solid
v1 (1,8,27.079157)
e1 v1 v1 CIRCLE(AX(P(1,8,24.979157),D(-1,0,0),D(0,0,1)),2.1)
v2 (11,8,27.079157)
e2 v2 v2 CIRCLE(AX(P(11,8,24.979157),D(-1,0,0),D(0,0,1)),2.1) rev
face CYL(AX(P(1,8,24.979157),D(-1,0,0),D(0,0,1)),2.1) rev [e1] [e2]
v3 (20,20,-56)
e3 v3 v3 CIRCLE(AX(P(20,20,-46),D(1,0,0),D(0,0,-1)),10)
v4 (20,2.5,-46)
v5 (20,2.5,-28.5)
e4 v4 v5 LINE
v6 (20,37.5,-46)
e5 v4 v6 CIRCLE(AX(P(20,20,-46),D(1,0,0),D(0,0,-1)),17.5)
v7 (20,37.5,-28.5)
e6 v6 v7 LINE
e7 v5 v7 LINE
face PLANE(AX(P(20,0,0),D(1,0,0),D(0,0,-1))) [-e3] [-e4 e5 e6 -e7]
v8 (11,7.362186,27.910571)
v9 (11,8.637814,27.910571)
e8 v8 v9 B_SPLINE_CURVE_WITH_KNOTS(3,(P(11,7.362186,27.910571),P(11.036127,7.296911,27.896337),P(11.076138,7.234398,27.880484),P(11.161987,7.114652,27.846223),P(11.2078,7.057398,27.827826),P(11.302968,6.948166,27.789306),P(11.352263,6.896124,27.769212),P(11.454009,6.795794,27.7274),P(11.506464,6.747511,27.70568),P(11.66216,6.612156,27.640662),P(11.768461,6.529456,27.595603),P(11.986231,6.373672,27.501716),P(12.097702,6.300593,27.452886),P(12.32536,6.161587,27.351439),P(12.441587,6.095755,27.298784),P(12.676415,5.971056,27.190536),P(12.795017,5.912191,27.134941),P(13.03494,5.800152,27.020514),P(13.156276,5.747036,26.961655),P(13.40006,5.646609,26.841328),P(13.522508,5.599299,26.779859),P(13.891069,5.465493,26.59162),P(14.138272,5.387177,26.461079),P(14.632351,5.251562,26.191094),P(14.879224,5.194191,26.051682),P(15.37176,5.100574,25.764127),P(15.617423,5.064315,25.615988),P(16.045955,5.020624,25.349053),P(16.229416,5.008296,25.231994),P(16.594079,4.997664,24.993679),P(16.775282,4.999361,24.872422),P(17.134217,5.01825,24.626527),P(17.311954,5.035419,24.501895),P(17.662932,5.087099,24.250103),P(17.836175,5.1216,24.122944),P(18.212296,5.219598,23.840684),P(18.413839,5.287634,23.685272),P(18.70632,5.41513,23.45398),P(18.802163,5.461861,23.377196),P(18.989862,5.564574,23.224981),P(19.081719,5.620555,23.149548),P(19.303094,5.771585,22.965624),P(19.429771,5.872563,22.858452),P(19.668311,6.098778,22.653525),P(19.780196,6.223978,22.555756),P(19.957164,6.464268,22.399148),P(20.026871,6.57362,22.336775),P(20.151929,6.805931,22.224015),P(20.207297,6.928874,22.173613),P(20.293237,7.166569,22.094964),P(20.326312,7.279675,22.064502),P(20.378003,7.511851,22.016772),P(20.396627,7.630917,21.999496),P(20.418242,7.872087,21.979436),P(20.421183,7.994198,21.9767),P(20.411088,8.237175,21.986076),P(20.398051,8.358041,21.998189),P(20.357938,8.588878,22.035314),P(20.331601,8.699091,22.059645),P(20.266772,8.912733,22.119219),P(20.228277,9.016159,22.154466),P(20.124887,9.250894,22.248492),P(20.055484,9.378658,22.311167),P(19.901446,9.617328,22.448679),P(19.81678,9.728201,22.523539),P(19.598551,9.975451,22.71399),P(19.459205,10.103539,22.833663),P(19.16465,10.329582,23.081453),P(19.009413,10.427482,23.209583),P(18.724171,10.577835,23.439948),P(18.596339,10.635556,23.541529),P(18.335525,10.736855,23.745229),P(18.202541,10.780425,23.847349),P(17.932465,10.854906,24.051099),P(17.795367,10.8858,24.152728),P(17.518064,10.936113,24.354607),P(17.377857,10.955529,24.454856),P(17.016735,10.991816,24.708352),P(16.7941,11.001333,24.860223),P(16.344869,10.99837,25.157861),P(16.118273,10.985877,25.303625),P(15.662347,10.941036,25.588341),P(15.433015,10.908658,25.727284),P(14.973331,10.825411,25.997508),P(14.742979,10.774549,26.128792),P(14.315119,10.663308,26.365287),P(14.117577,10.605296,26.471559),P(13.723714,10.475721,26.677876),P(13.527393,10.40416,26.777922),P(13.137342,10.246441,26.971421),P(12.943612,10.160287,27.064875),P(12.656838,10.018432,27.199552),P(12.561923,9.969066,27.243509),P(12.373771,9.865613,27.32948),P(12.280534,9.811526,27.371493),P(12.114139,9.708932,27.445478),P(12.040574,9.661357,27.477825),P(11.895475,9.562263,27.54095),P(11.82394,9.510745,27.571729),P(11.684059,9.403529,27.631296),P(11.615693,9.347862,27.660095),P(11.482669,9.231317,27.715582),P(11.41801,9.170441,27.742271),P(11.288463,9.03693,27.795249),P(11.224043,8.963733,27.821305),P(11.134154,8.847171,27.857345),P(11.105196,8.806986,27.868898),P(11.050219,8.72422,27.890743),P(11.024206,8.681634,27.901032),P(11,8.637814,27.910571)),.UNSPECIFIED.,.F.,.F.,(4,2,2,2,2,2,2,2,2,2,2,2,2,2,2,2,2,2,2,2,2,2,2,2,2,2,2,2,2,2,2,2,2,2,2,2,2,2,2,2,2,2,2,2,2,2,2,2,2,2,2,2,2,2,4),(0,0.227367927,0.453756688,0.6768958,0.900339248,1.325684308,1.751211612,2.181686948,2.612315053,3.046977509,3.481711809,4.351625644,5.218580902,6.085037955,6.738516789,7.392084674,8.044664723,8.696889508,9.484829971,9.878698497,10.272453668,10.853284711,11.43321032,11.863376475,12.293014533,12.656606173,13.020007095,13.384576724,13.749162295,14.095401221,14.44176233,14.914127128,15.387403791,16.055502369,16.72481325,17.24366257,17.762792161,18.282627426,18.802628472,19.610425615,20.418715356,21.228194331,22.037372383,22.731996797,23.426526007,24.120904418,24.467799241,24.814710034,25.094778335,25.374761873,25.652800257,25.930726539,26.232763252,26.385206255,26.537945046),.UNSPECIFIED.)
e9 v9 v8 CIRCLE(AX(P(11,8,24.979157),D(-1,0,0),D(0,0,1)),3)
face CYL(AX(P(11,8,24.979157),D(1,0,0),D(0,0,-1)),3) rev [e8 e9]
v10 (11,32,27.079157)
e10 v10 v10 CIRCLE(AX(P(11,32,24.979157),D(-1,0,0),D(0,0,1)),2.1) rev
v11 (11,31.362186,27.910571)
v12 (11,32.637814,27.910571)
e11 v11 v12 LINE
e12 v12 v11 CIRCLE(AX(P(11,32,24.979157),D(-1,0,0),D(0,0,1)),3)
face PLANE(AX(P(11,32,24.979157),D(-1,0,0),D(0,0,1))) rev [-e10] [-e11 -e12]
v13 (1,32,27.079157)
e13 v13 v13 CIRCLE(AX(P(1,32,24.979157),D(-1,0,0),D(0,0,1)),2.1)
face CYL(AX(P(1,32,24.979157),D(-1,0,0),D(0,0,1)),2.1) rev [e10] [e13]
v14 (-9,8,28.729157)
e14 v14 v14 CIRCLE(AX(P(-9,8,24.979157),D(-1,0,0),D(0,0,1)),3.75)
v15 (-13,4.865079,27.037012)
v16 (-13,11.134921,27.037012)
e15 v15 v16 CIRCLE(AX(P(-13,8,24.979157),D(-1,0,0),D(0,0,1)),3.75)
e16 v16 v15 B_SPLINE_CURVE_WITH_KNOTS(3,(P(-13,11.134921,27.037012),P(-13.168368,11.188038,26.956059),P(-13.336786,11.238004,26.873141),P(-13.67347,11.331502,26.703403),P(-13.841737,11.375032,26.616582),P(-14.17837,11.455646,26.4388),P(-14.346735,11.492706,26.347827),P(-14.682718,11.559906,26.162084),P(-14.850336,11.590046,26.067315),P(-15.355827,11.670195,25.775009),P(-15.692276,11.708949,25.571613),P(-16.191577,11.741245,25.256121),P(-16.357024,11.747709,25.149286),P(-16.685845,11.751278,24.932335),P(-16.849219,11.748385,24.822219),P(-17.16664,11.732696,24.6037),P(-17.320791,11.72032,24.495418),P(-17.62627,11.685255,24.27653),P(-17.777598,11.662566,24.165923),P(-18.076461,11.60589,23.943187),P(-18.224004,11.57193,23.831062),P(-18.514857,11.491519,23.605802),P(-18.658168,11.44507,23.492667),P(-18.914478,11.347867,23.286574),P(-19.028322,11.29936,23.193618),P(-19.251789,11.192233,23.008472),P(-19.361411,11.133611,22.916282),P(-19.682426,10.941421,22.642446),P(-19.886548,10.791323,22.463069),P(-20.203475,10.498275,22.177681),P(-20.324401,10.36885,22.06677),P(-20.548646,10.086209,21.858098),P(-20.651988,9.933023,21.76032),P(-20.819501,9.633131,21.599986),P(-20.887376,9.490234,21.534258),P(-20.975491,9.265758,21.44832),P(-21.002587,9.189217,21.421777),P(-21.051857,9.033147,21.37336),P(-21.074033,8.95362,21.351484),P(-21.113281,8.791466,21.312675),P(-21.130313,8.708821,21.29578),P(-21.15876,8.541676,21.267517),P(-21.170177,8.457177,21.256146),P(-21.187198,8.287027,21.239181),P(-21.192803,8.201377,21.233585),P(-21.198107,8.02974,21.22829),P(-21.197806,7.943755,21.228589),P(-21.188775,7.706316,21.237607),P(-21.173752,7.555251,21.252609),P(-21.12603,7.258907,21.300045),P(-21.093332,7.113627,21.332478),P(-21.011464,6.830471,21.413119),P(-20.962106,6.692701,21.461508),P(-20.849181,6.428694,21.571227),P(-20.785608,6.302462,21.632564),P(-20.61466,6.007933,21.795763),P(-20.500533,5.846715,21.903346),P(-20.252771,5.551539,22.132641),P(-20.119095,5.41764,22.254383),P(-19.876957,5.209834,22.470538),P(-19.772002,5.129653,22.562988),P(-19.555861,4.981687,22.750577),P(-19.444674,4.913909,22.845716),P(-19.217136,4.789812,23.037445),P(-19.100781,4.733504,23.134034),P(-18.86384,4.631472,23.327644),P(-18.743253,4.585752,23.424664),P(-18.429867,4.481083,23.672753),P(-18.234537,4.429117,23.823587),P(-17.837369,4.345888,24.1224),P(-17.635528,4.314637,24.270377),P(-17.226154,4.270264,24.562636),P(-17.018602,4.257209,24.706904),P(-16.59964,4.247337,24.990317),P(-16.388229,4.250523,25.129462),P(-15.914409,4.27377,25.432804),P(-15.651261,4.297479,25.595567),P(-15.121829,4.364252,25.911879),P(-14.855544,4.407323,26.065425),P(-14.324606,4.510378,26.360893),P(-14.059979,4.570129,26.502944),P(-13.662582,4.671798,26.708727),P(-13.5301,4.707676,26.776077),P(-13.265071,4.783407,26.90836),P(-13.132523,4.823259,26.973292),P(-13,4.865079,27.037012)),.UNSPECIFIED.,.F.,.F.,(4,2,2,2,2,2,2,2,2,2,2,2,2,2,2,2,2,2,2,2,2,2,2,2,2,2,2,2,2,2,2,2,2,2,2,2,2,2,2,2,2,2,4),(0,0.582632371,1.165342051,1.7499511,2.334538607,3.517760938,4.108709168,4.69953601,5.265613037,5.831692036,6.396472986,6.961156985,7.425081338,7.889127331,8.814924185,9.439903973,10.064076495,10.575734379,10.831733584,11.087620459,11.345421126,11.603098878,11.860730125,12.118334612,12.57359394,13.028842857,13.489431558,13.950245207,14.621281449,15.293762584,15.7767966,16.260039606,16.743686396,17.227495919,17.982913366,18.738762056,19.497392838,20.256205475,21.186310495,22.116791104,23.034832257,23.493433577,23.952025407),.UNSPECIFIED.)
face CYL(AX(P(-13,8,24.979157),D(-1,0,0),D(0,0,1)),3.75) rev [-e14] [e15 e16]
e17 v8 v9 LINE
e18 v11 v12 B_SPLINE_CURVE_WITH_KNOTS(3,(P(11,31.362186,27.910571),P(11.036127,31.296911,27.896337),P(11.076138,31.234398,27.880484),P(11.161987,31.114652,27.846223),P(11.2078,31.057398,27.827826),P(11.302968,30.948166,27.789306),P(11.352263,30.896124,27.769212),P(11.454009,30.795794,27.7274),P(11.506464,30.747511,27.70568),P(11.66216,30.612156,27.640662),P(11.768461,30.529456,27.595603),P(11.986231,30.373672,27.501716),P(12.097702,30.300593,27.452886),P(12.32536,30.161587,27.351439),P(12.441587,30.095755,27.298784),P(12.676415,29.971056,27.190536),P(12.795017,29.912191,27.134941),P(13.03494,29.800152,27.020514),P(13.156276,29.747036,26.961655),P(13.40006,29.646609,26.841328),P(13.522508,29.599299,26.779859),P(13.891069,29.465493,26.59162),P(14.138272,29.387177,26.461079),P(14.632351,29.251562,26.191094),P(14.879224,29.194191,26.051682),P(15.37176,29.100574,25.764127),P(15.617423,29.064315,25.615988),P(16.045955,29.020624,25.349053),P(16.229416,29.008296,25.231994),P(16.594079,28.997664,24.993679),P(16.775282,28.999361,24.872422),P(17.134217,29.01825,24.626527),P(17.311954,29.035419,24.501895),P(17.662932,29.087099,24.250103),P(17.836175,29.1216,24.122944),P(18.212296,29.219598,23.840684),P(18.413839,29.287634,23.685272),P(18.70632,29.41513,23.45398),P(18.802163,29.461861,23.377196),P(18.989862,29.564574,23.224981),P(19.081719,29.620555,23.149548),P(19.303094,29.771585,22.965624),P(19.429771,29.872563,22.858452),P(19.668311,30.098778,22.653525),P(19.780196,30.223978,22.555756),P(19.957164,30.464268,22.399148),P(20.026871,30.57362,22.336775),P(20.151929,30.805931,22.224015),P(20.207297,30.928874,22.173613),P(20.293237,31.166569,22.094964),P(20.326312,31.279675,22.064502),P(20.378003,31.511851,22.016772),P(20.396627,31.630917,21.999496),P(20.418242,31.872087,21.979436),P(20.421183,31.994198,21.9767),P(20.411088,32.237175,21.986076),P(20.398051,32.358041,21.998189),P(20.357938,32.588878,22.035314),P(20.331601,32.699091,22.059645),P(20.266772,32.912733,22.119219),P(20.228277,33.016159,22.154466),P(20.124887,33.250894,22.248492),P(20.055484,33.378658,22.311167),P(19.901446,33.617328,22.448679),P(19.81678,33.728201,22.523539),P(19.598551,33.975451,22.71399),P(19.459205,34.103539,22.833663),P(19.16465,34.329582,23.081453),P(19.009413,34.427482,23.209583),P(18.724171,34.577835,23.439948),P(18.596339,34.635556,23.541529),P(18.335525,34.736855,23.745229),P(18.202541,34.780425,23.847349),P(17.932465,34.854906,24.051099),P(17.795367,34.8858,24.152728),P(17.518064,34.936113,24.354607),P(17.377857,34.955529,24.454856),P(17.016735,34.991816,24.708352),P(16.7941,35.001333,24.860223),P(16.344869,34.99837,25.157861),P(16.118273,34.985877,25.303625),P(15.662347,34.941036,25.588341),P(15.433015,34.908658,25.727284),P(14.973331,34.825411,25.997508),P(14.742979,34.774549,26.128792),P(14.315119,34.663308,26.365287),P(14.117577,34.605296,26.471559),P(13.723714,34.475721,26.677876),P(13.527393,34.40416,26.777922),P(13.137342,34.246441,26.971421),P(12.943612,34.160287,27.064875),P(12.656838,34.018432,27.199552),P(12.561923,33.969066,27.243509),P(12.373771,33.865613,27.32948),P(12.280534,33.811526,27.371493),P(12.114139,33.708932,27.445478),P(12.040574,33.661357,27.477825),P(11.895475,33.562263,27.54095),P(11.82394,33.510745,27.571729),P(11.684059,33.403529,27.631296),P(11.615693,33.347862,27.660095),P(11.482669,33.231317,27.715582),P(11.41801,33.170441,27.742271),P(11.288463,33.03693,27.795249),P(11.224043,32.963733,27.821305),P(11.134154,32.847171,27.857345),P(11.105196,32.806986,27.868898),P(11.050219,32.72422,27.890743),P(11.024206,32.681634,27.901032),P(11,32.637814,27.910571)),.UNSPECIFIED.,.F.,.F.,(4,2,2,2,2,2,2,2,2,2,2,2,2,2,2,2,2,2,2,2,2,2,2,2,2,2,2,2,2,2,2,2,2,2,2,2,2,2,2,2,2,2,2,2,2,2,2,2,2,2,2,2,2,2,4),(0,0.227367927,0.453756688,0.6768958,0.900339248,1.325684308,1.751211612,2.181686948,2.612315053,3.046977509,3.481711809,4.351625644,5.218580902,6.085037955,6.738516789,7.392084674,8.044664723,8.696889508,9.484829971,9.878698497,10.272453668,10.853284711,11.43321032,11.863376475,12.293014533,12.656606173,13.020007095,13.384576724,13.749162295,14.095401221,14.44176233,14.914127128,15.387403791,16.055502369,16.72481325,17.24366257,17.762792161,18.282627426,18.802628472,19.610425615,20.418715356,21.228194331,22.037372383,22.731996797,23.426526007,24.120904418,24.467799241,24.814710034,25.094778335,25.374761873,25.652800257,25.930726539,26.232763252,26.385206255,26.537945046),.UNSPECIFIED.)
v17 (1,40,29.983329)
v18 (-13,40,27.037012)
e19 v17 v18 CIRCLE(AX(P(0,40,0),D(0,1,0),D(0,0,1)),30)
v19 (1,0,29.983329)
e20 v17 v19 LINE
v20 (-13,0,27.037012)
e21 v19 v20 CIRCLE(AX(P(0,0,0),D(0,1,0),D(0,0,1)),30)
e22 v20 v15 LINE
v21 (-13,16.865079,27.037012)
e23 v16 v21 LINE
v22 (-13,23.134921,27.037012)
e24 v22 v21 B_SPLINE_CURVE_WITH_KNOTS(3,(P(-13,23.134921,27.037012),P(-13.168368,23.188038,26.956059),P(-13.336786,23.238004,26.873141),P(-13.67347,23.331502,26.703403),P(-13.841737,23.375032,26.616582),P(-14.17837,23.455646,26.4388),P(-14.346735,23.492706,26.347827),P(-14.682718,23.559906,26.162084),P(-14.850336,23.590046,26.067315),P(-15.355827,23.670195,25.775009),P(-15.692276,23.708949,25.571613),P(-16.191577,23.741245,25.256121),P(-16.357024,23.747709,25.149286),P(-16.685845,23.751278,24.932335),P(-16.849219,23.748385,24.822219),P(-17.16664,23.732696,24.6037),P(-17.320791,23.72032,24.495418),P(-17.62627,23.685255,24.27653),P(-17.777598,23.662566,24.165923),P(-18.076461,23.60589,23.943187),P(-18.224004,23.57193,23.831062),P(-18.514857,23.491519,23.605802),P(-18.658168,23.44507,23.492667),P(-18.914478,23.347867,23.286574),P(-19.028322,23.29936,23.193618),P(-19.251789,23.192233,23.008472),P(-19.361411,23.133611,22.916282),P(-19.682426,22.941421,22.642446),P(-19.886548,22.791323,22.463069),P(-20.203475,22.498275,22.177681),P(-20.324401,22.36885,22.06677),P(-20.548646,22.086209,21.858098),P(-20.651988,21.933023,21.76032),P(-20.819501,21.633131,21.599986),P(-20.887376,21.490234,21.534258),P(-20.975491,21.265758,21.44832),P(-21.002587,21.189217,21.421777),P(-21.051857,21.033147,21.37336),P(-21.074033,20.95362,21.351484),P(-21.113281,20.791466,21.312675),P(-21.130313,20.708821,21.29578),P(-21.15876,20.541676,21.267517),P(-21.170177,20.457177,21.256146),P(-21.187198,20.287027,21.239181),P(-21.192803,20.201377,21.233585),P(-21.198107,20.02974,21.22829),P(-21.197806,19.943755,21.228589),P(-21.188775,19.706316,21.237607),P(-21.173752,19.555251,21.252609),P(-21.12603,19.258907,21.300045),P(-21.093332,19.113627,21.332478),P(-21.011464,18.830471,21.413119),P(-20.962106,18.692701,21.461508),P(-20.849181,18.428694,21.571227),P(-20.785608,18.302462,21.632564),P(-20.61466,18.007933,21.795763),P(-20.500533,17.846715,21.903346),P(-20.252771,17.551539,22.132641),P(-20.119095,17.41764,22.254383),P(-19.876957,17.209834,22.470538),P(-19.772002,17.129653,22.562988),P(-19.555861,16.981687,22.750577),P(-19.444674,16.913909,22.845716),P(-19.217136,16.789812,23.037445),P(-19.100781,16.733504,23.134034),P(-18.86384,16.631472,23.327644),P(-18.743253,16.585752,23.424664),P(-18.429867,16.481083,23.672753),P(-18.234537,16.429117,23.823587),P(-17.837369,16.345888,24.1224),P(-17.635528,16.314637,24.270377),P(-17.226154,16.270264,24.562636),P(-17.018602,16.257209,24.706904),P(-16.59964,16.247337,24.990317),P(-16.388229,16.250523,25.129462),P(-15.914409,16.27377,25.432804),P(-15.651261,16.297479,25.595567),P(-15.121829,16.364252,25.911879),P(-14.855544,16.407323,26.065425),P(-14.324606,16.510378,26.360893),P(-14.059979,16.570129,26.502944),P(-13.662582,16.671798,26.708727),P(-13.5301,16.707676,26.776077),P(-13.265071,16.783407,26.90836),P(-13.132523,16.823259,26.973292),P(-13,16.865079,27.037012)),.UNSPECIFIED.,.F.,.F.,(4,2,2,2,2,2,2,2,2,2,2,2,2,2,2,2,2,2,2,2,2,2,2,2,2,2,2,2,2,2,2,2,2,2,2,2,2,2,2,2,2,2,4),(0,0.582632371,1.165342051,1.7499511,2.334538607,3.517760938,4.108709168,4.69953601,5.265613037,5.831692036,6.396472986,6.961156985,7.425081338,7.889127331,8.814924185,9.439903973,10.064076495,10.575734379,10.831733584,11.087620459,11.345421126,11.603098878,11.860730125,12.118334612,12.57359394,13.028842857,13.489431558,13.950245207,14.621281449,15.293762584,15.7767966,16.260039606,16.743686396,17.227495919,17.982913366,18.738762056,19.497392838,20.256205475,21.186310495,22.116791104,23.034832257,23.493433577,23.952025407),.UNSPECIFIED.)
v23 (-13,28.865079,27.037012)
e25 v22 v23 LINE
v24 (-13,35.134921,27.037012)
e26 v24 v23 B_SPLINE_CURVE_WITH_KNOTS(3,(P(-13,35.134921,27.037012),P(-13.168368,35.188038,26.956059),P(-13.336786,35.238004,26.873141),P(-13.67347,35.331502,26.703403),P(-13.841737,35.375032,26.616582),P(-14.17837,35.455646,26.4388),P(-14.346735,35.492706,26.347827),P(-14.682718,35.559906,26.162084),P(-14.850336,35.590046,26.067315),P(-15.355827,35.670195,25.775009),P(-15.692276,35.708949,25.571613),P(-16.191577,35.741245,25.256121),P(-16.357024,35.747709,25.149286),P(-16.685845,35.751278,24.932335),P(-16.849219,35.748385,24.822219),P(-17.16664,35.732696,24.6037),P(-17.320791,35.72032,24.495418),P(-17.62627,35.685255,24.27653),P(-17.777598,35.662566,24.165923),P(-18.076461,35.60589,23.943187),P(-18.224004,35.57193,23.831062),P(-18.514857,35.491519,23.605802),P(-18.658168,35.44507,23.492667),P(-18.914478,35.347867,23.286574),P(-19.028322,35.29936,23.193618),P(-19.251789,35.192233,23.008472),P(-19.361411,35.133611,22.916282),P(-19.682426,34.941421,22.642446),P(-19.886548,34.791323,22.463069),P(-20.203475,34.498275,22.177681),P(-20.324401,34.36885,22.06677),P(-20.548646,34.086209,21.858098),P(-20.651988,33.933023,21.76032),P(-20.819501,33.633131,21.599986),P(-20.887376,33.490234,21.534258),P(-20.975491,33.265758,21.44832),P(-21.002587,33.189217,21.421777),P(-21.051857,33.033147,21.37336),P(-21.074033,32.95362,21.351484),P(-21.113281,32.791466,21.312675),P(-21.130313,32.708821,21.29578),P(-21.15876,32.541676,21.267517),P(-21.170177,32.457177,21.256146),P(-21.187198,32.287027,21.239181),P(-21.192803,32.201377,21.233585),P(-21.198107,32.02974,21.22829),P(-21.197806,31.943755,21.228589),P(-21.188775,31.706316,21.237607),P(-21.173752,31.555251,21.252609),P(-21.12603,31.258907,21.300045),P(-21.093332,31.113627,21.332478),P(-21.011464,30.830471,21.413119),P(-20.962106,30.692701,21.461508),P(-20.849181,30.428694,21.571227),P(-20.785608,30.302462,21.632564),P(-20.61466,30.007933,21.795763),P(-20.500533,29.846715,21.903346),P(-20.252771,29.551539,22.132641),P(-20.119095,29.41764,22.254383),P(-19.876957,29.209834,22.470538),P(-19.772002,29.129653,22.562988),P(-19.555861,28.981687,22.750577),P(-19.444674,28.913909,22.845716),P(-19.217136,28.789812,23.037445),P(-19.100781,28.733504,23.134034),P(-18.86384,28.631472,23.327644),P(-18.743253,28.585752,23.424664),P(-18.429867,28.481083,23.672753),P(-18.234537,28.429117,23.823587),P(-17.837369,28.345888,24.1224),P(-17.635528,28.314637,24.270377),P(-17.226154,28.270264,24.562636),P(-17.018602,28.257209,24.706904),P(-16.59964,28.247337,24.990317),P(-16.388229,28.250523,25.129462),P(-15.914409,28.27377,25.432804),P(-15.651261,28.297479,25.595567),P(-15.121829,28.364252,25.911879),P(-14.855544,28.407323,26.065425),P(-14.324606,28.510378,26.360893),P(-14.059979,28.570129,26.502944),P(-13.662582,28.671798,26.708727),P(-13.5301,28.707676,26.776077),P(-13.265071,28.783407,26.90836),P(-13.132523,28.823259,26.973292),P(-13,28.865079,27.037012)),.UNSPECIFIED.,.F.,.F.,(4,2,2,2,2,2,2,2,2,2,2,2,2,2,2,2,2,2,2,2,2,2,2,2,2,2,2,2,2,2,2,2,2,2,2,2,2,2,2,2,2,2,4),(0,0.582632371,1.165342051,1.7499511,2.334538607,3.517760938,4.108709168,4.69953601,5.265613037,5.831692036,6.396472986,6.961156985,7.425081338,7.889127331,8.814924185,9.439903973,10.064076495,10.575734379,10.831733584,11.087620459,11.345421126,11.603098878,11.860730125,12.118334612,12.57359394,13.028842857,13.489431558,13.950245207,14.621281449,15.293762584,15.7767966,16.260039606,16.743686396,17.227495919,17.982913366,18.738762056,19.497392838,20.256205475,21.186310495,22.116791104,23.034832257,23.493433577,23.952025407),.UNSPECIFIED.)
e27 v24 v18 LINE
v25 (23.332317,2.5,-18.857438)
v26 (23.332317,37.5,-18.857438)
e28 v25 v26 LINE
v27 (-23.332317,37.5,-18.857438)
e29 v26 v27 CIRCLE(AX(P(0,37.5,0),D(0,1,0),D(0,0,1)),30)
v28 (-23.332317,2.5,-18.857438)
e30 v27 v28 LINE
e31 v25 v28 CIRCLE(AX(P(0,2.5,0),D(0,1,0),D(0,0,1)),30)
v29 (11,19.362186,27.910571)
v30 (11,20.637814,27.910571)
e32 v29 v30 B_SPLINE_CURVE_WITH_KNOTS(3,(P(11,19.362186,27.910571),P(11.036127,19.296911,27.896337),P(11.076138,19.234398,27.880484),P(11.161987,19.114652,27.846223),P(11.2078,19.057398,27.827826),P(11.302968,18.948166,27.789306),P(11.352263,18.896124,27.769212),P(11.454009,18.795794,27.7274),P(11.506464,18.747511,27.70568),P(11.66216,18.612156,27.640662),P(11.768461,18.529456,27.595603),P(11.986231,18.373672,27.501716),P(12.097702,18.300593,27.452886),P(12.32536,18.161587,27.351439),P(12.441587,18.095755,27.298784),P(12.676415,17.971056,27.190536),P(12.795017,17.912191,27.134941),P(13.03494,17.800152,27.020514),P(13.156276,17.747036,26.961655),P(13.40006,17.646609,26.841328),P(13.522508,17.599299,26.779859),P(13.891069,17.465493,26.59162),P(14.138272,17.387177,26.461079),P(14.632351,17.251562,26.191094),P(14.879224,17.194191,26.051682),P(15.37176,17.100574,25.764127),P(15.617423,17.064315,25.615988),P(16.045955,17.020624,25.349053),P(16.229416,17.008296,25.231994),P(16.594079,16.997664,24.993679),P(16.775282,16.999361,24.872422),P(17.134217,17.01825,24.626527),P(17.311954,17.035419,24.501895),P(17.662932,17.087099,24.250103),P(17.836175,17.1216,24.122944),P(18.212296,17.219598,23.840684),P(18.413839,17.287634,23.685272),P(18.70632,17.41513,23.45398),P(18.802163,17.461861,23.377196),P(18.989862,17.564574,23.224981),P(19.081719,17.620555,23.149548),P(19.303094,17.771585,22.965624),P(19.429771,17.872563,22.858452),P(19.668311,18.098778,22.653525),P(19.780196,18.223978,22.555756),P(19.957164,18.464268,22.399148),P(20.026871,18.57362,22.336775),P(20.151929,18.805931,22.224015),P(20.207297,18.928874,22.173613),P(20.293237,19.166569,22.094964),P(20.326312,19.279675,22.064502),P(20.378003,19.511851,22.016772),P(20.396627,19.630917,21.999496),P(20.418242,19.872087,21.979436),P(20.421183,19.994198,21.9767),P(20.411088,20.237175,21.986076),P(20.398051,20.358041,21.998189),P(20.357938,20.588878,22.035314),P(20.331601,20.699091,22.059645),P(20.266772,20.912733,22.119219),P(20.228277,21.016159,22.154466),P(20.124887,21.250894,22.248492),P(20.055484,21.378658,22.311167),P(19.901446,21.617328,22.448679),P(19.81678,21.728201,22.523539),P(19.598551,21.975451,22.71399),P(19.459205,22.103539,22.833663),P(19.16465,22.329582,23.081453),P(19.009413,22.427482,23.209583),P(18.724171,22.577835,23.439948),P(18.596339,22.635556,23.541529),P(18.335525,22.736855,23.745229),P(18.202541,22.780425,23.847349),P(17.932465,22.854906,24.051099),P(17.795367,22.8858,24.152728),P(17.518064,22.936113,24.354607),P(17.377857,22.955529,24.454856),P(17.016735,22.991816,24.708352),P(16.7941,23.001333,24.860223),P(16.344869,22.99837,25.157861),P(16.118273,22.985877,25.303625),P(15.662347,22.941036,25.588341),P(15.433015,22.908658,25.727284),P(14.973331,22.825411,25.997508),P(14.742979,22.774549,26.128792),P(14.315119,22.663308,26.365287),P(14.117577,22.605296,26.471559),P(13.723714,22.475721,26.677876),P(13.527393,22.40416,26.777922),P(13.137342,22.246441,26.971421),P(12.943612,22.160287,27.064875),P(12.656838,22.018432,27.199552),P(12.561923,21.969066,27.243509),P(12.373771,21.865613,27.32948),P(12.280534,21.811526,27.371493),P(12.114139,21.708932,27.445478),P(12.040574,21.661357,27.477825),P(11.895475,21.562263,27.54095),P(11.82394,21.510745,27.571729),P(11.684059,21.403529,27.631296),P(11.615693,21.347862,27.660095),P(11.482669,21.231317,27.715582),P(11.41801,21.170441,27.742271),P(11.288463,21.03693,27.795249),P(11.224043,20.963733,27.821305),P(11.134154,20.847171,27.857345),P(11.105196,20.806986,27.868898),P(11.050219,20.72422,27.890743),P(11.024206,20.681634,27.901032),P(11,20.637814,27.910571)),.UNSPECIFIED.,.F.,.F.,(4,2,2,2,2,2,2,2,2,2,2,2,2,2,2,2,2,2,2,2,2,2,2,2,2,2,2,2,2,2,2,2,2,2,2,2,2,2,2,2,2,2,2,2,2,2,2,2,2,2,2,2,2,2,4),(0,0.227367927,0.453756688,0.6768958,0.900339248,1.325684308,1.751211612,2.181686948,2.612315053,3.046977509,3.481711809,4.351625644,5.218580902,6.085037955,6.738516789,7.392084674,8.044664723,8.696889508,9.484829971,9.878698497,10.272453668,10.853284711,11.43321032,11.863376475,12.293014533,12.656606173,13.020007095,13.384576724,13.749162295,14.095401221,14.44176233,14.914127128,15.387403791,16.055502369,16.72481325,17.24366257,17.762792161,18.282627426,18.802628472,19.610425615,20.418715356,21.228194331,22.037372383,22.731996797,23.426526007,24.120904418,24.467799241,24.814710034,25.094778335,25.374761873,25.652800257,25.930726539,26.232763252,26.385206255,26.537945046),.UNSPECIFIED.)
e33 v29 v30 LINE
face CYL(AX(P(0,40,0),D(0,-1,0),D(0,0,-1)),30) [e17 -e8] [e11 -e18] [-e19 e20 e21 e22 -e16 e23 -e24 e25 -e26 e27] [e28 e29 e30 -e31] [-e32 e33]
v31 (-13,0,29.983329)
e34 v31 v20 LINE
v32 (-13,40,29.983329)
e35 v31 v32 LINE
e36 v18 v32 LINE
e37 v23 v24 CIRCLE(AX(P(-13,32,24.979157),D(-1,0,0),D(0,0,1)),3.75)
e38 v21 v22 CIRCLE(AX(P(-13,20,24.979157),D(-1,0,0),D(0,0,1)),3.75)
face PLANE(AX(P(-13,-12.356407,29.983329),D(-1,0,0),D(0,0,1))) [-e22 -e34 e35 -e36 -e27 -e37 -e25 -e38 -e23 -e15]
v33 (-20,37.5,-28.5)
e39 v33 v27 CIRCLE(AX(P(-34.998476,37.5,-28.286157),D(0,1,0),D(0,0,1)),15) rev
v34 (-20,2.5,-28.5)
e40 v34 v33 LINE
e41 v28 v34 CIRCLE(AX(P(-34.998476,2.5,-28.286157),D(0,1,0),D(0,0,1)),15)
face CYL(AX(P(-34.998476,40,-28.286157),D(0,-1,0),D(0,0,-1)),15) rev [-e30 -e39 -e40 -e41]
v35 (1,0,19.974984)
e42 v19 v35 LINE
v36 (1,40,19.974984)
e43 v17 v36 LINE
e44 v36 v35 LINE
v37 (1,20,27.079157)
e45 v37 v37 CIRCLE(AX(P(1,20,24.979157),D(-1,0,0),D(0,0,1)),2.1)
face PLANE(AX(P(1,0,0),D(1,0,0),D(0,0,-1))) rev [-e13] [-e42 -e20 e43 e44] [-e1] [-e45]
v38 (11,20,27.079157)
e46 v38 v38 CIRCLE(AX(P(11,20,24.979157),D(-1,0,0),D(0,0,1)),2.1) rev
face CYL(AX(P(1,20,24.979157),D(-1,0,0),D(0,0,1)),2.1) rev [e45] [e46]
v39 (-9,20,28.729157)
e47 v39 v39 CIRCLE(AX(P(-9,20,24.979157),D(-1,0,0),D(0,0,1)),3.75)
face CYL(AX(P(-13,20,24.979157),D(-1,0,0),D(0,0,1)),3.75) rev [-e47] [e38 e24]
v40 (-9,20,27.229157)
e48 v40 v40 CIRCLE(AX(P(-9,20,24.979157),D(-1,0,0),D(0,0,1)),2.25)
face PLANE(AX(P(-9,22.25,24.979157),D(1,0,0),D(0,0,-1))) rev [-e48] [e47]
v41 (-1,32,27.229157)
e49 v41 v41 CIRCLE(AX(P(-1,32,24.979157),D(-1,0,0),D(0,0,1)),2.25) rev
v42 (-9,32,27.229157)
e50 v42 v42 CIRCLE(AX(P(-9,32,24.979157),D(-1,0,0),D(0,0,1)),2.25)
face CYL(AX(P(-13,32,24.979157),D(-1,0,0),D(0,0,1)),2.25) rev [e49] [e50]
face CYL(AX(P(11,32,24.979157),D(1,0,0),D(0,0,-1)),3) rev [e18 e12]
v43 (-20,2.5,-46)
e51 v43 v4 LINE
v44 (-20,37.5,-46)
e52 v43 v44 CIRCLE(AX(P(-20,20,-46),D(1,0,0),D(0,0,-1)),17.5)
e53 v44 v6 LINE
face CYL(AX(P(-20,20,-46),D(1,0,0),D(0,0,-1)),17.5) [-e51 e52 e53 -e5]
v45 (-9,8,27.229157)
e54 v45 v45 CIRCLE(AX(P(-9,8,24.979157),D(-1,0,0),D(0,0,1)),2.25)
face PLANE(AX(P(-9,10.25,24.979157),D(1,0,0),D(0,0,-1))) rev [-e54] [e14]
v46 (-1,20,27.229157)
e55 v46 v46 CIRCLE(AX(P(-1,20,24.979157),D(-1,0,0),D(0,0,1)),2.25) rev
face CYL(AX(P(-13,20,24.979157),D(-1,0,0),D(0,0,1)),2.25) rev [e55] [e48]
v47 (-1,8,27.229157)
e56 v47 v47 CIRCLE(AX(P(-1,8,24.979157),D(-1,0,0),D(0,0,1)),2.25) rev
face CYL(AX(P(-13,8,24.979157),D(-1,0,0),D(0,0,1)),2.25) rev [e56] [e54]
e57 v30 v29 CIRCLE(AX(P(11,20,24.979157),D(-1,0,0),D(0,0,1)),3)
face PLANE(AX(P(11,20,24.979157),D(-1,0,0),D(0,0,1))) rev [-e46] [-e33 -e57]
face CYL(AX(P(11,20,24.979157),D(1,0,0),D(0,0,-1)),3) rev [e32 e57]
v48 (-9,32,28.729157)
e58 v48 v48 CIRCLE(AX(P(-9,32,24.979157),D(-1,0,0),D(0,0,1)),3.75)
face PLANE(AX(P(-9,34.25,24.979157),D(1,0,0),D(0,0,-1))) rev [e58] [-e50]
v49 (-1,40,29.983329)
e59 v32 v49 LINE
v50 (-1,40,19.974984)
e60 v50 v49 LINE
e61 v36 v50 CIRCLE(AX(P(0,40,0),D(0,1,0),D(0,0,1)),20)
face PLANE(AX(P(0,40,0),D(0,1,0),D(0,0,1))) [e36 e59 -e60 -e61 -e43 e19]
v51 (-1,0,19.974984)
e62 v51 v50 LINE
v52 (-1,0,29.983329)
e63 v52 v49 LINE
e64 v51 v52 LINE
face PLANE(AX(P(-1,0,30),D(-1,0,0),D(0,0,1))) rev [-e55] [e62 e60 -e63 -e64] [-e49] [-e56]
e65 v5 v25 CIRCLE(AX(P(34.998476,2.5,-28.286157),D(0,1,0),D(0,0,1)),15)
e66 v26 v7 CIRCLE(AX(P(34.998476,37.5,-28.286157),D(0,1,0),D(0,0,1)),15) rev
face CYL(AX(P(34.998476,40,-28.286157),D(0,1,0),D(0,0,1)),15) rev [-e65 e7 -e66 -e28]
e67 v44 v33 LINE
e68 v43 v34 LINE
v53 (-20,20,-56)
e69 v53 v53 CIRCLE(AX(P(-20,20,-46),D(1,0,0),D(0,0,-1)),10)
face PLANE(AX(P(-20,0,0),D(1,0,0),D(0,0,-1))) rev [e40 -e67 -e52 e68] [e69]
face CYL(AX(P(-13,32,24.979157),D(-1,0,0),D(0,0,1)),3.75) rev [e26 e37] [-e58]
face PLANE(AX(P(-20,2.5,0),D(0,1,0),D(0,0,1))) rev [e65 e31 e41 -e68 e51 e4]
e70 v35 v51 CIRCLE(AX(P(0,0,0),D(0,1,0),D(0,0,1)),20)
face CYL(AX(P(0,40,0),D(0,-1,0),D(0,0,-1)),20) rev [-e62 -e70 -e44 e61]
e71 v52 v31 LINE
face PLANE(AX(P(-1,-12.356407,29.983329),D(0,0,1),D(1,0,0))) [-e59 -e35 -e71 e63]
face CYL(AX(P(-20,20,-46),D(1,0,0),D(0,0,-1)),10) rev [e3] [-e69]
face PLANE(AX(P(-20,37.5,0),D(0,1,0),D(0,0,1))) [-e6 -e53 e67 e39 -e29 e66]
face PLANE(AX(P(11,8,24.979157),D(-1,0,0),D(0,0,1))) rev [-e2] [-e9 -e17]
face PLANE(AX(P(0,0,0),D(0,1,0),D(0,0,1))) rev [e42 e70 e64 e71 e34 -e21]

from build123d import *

# Parameters (mm, degrees)
SKETCH1_R                                    = 30
SKETCH1_R_2                                  = 20
BOSS_EXTRUDE1_DEPTH                          = 40
SKETCH2_W                                    = 2
SKETCH2_H                                    = 30
CUT_EXTRUDE1_DEPTH                           = 59.309518948
BOSS_EXTRUDE2_START                          = -40
BOSS_EXTRUDE2_DEPTH                          = 40
CBORE_FOR_M4_HEX_SOCKET_HEAD_CAP_SCR_2_COUNT = 2
CBORE_FOR_M4_HEX_SOCKET_HEAD_CAP_SCR_2_PITCH = 12
CBORE_FOR_M4_HEX_SOCKET_HEAD_CAP_SCR_3_COUNT = 2
CBORE_FOR_M4_HEX_SOCKET_HEAD_CAP_SCR_3_PITCH = 24
SKETCH6_R                                    = 3.75
CUT_EXTRUDE2_DEPTH                           = 66.946948375
F_5_4_5_4_DIAMETER_HOLE1_D                   = 4.2
SKETCH10_R                                   = 3
CUT_EXTRUDE3_DEPTH                           = 11
BOSS_EXTRUDE4_DEPTH                          = 20
BOSS_EXTRUDE4_DEPTH_BACK                     = 20
SKETCH13_R                                   = 17.5
SKETCH13_R_2                                 = 10
FILLET1_R                                    = 15


with BuildPart() as part:
    # Sketch1 → Boss-Extrude1 (new body)
    with BuildSketch(Plane(origin=(0, 0, 0), x_dir=(1, 0, 0), z_dir=(0, 1, 0))):
        with Locations(Location((0, 0, 0), (0, 0, 270))):
            Circle(SKETCH1_R)
        with Locations(Location((0, 0, 0), (0, 0, 270))):
            Circle(SKETCH1_R_2, mode=Mode.SUBTRACT)
    extrude(amount=BOSS_EXTRUDE1_DEPTH)

    # Sketch2 → Cut-Extrude1 (cut, through all)
    with BuildSketch(Plane(origin=(0, 40, 0), x_dir=(1, 0, 0), z_dir=(0, 1, 0))):
        with Locations((0, -15)):
            Rectangle(SKETCH2_W, SKETCH2_H)
    extrude(amount=-CUT_EXTRUDE1_DEPTH, mode=Mode.SUBTRACT)

    # Sketch3 → Boss-Extrude2 (add)
    with BuildSketch(Plane(origin=(0, 40, 0), x_dir=(1, 0, 0), z_dir=(0, 1, 0)).offset(BOSS_EXTRUDE2_START)):
        with BuildLine():
            Line((-1, -29.983328701), (-13, -29.983328701))
            Line((-13, -29.983328701), (-13, -27.037011669))
            ThreePointArc((-13, -27.037011669), (-7.153334608, -29.134683866), (-1, -29.983328701))
        make_face()
    extrude(amount=BOSS_EXTRUDE2_DEPTH)

    # Sketch5 → CBORE for M4 Hex Socket Head Cap Screw1 (revolve, cut)
    with BuildSketch(Plane(origin=(-13, 32, 24.979156528), x_dir=(0, 0, 1), z_dir=(0, 1, 0))):
        Polygon((0, 0), (0, 13.351936393), (2.25, 12), (2.25, 4), (3.75, 4), (3.75, 0), align=None)
    cbore_for_m4_hex_socket_head_cap_screw1 = revolve(axis=Axis((-19.35, 32, 24.979156528), (1, 0, 0)), mode=Mode.SUBTRACT)

    # CBORE for M4 Hex Socket Head Cap Scr 2: CBORE for M4 Hex Socket Head Cap Screw1 ×2
    with Locations(*[(0, -i * CBORE_FOR_M4_HEX_SOCKET_HEAD_CAP_SCR_2_PITCH, 0) for i in range(1, CBORE_FOR_M4_HEX_SOCKET_HEAD_CAP_SCR_2_COUNT)]):
        add(cbore_for_m4_hex_socket_head_cap_screw1, mode=Mode.SUBTRACT)

    # CBORE for M4 Hex Socket Head Cap Scr 3: CBORE for M4 Hex Socket Head Cap Screw1 ×2
    with Locations(*[(0, -i * CBORE_FOR_M4_HEX_SOCKET_HEAD_CAP_SCR_3_PITCH, 0) for i in range(1, CBORE_FOR_M4_HEX_SOCKET_HEAD_CAP_SCR_3_COUNT)]):
        add(cbore_for_m4_hex_socket_head_cap_screw1, mode=Mode.SUBTRACT)

    # Sketch6 → Cut-Extrude2 (cut, through all)
    with BuildSketch(Plane.ZY.offset(13)):
        with Locations((24.979156528, 32)):
            Circle(SKETCH6_R)
        with Locations((24.979156528, 20)):
            Circle(SKETCH6_R)
        with Locations((24.979156528, 8)):
            Circle(SKETCH6_R)
    extrude(amount=CUT_EXTRUDE2_DEPTH, mode=Mode.SUBTRACT)

    # Ø5.4 (5.4) Diameter Hole1 (through all)
    with Locations(Plane.ZY.offset(-1)):
        with Locations((24.979156528, 8), (24.979156528, 20), (24.979156528, 32)):
            Hole(F_5_4_5_4_DIAMETER_HOLE1_D / 2)

    # Sketch10 → Cut-Extrude3 (cut)
    with BuildSketch(Plane.ZY.offset(-22)):
        with Locations((24.979156528, 8)):
            Circle(SKETCH10_R)
        with Locations((24.979156528, 32)):
            Circle(SKETCH10_R)
        with Locations((24.979156528, 20)):
            Circle(SKETCH10_R)
    extrude(amount=CUT_EXTRUDE3_DEPTH, mode=Mode.SUBTRACT)

    # Sketch13 → Boss-Extrude4 (add, two sides: drawn at the far end of the back side and taken through both)
    # profile 1 of 3: a face of its own
    with BuildSketch(Plane(origin=(0, 0, 0), x_dir=(0, 0, -1), z_dir=(1, 0, 0)).offset(-BOSS_EXTRUDE4_DEPTH_BACK)):
        with BuildLine():
            ThreePointArc((28.5, 20), (33.625631329, 32.374368671), (46, 37.5))
            Line((46, 37.5), (30, 37.5))
            Line((30, 37.5), (28.5, 37.5))
            Line((28.5, 37.5), (28.5, 20))
        make_face()
    # profile 2 of 3: a face of its own
    with BuildSketch(Plane(origin=(0, 0, 0), x_dir=(0, 0, -1), z_dir=(1, 0, 0)).offset(-BOSS_EXTRUDE4_DEPTH_BACK)):
        with BuildLine():
            ThreePointArc((46, 2.5), (33.625631329, 7.625631329), (28.5, 20))
            Line((28.5, 20), (28.5, 2.5))
            Line((28.5, 2.5), (30, 2.5))
            Line((30, 2.5), (46, 2.5))
        make_face()
    # profile 3 of 3: a face of its own
    with BuildSketch(Plane(origin=(0, 0, 0), x_dir=(0, 0, -1), z_dir=(1, 0, 0)).offset(-BOSS_EXTRUDE4_DEPTH_BACK)):
        with Locations((46, 20)):
            Circle(SKETCH13_R)
        with Locations((46, 20)):
            Circle(SKETCH13_R_2, mode=Mode.SUBTRACT)
    extrude(amount=BOSS_EXTRUDE4_DEPTH + BOSS_EXTRUDE4_DEPTH_BACK)

    # Fillet1
    # the kernel refuses this fillet: 15 mm, written as the material it adds along each edge
    with BuildSketch(Plane(origin=(9.367496998, 37.5, -28.5), x_dir=(0.8228917781054501, 0, 0.5681981357998729), z_dir=(0, -1, 0))) as fillet1_piece_1:
        with BuildLine():
            CenterArc((21.213026524, -14.387505004), FILLET1_R, 106.429799285, 39.762375137)
            Line((8.749399301, -6.041368385), (0, 0))
            ThreePointArc((0, 0), (8.48521061, -1.224989993), (16.970421219, 0))
        make_face()
    extrude(amount=35)
    with BuildSketch(Plane(origin=(-9.367496998, 37.5, -28.5), x_dir=(-0.8228917781054502, 0, 0.5681981357998726), z_dir=(0, -1, 0))) as fillet1_piece_2:
        with BuildLine():
            CenterArc((21.213026524, 14.387505004), FILLET1_R, 213.807825578, 39.762375137)
            Line((8.749399301, 6.041368385), (0, 0))
            ThreePointArc((0, 0), (8.48521061, 1.224989993), (16.970421219, 0))
        make_face()
    extrude(amount=35)


solid = part.part
